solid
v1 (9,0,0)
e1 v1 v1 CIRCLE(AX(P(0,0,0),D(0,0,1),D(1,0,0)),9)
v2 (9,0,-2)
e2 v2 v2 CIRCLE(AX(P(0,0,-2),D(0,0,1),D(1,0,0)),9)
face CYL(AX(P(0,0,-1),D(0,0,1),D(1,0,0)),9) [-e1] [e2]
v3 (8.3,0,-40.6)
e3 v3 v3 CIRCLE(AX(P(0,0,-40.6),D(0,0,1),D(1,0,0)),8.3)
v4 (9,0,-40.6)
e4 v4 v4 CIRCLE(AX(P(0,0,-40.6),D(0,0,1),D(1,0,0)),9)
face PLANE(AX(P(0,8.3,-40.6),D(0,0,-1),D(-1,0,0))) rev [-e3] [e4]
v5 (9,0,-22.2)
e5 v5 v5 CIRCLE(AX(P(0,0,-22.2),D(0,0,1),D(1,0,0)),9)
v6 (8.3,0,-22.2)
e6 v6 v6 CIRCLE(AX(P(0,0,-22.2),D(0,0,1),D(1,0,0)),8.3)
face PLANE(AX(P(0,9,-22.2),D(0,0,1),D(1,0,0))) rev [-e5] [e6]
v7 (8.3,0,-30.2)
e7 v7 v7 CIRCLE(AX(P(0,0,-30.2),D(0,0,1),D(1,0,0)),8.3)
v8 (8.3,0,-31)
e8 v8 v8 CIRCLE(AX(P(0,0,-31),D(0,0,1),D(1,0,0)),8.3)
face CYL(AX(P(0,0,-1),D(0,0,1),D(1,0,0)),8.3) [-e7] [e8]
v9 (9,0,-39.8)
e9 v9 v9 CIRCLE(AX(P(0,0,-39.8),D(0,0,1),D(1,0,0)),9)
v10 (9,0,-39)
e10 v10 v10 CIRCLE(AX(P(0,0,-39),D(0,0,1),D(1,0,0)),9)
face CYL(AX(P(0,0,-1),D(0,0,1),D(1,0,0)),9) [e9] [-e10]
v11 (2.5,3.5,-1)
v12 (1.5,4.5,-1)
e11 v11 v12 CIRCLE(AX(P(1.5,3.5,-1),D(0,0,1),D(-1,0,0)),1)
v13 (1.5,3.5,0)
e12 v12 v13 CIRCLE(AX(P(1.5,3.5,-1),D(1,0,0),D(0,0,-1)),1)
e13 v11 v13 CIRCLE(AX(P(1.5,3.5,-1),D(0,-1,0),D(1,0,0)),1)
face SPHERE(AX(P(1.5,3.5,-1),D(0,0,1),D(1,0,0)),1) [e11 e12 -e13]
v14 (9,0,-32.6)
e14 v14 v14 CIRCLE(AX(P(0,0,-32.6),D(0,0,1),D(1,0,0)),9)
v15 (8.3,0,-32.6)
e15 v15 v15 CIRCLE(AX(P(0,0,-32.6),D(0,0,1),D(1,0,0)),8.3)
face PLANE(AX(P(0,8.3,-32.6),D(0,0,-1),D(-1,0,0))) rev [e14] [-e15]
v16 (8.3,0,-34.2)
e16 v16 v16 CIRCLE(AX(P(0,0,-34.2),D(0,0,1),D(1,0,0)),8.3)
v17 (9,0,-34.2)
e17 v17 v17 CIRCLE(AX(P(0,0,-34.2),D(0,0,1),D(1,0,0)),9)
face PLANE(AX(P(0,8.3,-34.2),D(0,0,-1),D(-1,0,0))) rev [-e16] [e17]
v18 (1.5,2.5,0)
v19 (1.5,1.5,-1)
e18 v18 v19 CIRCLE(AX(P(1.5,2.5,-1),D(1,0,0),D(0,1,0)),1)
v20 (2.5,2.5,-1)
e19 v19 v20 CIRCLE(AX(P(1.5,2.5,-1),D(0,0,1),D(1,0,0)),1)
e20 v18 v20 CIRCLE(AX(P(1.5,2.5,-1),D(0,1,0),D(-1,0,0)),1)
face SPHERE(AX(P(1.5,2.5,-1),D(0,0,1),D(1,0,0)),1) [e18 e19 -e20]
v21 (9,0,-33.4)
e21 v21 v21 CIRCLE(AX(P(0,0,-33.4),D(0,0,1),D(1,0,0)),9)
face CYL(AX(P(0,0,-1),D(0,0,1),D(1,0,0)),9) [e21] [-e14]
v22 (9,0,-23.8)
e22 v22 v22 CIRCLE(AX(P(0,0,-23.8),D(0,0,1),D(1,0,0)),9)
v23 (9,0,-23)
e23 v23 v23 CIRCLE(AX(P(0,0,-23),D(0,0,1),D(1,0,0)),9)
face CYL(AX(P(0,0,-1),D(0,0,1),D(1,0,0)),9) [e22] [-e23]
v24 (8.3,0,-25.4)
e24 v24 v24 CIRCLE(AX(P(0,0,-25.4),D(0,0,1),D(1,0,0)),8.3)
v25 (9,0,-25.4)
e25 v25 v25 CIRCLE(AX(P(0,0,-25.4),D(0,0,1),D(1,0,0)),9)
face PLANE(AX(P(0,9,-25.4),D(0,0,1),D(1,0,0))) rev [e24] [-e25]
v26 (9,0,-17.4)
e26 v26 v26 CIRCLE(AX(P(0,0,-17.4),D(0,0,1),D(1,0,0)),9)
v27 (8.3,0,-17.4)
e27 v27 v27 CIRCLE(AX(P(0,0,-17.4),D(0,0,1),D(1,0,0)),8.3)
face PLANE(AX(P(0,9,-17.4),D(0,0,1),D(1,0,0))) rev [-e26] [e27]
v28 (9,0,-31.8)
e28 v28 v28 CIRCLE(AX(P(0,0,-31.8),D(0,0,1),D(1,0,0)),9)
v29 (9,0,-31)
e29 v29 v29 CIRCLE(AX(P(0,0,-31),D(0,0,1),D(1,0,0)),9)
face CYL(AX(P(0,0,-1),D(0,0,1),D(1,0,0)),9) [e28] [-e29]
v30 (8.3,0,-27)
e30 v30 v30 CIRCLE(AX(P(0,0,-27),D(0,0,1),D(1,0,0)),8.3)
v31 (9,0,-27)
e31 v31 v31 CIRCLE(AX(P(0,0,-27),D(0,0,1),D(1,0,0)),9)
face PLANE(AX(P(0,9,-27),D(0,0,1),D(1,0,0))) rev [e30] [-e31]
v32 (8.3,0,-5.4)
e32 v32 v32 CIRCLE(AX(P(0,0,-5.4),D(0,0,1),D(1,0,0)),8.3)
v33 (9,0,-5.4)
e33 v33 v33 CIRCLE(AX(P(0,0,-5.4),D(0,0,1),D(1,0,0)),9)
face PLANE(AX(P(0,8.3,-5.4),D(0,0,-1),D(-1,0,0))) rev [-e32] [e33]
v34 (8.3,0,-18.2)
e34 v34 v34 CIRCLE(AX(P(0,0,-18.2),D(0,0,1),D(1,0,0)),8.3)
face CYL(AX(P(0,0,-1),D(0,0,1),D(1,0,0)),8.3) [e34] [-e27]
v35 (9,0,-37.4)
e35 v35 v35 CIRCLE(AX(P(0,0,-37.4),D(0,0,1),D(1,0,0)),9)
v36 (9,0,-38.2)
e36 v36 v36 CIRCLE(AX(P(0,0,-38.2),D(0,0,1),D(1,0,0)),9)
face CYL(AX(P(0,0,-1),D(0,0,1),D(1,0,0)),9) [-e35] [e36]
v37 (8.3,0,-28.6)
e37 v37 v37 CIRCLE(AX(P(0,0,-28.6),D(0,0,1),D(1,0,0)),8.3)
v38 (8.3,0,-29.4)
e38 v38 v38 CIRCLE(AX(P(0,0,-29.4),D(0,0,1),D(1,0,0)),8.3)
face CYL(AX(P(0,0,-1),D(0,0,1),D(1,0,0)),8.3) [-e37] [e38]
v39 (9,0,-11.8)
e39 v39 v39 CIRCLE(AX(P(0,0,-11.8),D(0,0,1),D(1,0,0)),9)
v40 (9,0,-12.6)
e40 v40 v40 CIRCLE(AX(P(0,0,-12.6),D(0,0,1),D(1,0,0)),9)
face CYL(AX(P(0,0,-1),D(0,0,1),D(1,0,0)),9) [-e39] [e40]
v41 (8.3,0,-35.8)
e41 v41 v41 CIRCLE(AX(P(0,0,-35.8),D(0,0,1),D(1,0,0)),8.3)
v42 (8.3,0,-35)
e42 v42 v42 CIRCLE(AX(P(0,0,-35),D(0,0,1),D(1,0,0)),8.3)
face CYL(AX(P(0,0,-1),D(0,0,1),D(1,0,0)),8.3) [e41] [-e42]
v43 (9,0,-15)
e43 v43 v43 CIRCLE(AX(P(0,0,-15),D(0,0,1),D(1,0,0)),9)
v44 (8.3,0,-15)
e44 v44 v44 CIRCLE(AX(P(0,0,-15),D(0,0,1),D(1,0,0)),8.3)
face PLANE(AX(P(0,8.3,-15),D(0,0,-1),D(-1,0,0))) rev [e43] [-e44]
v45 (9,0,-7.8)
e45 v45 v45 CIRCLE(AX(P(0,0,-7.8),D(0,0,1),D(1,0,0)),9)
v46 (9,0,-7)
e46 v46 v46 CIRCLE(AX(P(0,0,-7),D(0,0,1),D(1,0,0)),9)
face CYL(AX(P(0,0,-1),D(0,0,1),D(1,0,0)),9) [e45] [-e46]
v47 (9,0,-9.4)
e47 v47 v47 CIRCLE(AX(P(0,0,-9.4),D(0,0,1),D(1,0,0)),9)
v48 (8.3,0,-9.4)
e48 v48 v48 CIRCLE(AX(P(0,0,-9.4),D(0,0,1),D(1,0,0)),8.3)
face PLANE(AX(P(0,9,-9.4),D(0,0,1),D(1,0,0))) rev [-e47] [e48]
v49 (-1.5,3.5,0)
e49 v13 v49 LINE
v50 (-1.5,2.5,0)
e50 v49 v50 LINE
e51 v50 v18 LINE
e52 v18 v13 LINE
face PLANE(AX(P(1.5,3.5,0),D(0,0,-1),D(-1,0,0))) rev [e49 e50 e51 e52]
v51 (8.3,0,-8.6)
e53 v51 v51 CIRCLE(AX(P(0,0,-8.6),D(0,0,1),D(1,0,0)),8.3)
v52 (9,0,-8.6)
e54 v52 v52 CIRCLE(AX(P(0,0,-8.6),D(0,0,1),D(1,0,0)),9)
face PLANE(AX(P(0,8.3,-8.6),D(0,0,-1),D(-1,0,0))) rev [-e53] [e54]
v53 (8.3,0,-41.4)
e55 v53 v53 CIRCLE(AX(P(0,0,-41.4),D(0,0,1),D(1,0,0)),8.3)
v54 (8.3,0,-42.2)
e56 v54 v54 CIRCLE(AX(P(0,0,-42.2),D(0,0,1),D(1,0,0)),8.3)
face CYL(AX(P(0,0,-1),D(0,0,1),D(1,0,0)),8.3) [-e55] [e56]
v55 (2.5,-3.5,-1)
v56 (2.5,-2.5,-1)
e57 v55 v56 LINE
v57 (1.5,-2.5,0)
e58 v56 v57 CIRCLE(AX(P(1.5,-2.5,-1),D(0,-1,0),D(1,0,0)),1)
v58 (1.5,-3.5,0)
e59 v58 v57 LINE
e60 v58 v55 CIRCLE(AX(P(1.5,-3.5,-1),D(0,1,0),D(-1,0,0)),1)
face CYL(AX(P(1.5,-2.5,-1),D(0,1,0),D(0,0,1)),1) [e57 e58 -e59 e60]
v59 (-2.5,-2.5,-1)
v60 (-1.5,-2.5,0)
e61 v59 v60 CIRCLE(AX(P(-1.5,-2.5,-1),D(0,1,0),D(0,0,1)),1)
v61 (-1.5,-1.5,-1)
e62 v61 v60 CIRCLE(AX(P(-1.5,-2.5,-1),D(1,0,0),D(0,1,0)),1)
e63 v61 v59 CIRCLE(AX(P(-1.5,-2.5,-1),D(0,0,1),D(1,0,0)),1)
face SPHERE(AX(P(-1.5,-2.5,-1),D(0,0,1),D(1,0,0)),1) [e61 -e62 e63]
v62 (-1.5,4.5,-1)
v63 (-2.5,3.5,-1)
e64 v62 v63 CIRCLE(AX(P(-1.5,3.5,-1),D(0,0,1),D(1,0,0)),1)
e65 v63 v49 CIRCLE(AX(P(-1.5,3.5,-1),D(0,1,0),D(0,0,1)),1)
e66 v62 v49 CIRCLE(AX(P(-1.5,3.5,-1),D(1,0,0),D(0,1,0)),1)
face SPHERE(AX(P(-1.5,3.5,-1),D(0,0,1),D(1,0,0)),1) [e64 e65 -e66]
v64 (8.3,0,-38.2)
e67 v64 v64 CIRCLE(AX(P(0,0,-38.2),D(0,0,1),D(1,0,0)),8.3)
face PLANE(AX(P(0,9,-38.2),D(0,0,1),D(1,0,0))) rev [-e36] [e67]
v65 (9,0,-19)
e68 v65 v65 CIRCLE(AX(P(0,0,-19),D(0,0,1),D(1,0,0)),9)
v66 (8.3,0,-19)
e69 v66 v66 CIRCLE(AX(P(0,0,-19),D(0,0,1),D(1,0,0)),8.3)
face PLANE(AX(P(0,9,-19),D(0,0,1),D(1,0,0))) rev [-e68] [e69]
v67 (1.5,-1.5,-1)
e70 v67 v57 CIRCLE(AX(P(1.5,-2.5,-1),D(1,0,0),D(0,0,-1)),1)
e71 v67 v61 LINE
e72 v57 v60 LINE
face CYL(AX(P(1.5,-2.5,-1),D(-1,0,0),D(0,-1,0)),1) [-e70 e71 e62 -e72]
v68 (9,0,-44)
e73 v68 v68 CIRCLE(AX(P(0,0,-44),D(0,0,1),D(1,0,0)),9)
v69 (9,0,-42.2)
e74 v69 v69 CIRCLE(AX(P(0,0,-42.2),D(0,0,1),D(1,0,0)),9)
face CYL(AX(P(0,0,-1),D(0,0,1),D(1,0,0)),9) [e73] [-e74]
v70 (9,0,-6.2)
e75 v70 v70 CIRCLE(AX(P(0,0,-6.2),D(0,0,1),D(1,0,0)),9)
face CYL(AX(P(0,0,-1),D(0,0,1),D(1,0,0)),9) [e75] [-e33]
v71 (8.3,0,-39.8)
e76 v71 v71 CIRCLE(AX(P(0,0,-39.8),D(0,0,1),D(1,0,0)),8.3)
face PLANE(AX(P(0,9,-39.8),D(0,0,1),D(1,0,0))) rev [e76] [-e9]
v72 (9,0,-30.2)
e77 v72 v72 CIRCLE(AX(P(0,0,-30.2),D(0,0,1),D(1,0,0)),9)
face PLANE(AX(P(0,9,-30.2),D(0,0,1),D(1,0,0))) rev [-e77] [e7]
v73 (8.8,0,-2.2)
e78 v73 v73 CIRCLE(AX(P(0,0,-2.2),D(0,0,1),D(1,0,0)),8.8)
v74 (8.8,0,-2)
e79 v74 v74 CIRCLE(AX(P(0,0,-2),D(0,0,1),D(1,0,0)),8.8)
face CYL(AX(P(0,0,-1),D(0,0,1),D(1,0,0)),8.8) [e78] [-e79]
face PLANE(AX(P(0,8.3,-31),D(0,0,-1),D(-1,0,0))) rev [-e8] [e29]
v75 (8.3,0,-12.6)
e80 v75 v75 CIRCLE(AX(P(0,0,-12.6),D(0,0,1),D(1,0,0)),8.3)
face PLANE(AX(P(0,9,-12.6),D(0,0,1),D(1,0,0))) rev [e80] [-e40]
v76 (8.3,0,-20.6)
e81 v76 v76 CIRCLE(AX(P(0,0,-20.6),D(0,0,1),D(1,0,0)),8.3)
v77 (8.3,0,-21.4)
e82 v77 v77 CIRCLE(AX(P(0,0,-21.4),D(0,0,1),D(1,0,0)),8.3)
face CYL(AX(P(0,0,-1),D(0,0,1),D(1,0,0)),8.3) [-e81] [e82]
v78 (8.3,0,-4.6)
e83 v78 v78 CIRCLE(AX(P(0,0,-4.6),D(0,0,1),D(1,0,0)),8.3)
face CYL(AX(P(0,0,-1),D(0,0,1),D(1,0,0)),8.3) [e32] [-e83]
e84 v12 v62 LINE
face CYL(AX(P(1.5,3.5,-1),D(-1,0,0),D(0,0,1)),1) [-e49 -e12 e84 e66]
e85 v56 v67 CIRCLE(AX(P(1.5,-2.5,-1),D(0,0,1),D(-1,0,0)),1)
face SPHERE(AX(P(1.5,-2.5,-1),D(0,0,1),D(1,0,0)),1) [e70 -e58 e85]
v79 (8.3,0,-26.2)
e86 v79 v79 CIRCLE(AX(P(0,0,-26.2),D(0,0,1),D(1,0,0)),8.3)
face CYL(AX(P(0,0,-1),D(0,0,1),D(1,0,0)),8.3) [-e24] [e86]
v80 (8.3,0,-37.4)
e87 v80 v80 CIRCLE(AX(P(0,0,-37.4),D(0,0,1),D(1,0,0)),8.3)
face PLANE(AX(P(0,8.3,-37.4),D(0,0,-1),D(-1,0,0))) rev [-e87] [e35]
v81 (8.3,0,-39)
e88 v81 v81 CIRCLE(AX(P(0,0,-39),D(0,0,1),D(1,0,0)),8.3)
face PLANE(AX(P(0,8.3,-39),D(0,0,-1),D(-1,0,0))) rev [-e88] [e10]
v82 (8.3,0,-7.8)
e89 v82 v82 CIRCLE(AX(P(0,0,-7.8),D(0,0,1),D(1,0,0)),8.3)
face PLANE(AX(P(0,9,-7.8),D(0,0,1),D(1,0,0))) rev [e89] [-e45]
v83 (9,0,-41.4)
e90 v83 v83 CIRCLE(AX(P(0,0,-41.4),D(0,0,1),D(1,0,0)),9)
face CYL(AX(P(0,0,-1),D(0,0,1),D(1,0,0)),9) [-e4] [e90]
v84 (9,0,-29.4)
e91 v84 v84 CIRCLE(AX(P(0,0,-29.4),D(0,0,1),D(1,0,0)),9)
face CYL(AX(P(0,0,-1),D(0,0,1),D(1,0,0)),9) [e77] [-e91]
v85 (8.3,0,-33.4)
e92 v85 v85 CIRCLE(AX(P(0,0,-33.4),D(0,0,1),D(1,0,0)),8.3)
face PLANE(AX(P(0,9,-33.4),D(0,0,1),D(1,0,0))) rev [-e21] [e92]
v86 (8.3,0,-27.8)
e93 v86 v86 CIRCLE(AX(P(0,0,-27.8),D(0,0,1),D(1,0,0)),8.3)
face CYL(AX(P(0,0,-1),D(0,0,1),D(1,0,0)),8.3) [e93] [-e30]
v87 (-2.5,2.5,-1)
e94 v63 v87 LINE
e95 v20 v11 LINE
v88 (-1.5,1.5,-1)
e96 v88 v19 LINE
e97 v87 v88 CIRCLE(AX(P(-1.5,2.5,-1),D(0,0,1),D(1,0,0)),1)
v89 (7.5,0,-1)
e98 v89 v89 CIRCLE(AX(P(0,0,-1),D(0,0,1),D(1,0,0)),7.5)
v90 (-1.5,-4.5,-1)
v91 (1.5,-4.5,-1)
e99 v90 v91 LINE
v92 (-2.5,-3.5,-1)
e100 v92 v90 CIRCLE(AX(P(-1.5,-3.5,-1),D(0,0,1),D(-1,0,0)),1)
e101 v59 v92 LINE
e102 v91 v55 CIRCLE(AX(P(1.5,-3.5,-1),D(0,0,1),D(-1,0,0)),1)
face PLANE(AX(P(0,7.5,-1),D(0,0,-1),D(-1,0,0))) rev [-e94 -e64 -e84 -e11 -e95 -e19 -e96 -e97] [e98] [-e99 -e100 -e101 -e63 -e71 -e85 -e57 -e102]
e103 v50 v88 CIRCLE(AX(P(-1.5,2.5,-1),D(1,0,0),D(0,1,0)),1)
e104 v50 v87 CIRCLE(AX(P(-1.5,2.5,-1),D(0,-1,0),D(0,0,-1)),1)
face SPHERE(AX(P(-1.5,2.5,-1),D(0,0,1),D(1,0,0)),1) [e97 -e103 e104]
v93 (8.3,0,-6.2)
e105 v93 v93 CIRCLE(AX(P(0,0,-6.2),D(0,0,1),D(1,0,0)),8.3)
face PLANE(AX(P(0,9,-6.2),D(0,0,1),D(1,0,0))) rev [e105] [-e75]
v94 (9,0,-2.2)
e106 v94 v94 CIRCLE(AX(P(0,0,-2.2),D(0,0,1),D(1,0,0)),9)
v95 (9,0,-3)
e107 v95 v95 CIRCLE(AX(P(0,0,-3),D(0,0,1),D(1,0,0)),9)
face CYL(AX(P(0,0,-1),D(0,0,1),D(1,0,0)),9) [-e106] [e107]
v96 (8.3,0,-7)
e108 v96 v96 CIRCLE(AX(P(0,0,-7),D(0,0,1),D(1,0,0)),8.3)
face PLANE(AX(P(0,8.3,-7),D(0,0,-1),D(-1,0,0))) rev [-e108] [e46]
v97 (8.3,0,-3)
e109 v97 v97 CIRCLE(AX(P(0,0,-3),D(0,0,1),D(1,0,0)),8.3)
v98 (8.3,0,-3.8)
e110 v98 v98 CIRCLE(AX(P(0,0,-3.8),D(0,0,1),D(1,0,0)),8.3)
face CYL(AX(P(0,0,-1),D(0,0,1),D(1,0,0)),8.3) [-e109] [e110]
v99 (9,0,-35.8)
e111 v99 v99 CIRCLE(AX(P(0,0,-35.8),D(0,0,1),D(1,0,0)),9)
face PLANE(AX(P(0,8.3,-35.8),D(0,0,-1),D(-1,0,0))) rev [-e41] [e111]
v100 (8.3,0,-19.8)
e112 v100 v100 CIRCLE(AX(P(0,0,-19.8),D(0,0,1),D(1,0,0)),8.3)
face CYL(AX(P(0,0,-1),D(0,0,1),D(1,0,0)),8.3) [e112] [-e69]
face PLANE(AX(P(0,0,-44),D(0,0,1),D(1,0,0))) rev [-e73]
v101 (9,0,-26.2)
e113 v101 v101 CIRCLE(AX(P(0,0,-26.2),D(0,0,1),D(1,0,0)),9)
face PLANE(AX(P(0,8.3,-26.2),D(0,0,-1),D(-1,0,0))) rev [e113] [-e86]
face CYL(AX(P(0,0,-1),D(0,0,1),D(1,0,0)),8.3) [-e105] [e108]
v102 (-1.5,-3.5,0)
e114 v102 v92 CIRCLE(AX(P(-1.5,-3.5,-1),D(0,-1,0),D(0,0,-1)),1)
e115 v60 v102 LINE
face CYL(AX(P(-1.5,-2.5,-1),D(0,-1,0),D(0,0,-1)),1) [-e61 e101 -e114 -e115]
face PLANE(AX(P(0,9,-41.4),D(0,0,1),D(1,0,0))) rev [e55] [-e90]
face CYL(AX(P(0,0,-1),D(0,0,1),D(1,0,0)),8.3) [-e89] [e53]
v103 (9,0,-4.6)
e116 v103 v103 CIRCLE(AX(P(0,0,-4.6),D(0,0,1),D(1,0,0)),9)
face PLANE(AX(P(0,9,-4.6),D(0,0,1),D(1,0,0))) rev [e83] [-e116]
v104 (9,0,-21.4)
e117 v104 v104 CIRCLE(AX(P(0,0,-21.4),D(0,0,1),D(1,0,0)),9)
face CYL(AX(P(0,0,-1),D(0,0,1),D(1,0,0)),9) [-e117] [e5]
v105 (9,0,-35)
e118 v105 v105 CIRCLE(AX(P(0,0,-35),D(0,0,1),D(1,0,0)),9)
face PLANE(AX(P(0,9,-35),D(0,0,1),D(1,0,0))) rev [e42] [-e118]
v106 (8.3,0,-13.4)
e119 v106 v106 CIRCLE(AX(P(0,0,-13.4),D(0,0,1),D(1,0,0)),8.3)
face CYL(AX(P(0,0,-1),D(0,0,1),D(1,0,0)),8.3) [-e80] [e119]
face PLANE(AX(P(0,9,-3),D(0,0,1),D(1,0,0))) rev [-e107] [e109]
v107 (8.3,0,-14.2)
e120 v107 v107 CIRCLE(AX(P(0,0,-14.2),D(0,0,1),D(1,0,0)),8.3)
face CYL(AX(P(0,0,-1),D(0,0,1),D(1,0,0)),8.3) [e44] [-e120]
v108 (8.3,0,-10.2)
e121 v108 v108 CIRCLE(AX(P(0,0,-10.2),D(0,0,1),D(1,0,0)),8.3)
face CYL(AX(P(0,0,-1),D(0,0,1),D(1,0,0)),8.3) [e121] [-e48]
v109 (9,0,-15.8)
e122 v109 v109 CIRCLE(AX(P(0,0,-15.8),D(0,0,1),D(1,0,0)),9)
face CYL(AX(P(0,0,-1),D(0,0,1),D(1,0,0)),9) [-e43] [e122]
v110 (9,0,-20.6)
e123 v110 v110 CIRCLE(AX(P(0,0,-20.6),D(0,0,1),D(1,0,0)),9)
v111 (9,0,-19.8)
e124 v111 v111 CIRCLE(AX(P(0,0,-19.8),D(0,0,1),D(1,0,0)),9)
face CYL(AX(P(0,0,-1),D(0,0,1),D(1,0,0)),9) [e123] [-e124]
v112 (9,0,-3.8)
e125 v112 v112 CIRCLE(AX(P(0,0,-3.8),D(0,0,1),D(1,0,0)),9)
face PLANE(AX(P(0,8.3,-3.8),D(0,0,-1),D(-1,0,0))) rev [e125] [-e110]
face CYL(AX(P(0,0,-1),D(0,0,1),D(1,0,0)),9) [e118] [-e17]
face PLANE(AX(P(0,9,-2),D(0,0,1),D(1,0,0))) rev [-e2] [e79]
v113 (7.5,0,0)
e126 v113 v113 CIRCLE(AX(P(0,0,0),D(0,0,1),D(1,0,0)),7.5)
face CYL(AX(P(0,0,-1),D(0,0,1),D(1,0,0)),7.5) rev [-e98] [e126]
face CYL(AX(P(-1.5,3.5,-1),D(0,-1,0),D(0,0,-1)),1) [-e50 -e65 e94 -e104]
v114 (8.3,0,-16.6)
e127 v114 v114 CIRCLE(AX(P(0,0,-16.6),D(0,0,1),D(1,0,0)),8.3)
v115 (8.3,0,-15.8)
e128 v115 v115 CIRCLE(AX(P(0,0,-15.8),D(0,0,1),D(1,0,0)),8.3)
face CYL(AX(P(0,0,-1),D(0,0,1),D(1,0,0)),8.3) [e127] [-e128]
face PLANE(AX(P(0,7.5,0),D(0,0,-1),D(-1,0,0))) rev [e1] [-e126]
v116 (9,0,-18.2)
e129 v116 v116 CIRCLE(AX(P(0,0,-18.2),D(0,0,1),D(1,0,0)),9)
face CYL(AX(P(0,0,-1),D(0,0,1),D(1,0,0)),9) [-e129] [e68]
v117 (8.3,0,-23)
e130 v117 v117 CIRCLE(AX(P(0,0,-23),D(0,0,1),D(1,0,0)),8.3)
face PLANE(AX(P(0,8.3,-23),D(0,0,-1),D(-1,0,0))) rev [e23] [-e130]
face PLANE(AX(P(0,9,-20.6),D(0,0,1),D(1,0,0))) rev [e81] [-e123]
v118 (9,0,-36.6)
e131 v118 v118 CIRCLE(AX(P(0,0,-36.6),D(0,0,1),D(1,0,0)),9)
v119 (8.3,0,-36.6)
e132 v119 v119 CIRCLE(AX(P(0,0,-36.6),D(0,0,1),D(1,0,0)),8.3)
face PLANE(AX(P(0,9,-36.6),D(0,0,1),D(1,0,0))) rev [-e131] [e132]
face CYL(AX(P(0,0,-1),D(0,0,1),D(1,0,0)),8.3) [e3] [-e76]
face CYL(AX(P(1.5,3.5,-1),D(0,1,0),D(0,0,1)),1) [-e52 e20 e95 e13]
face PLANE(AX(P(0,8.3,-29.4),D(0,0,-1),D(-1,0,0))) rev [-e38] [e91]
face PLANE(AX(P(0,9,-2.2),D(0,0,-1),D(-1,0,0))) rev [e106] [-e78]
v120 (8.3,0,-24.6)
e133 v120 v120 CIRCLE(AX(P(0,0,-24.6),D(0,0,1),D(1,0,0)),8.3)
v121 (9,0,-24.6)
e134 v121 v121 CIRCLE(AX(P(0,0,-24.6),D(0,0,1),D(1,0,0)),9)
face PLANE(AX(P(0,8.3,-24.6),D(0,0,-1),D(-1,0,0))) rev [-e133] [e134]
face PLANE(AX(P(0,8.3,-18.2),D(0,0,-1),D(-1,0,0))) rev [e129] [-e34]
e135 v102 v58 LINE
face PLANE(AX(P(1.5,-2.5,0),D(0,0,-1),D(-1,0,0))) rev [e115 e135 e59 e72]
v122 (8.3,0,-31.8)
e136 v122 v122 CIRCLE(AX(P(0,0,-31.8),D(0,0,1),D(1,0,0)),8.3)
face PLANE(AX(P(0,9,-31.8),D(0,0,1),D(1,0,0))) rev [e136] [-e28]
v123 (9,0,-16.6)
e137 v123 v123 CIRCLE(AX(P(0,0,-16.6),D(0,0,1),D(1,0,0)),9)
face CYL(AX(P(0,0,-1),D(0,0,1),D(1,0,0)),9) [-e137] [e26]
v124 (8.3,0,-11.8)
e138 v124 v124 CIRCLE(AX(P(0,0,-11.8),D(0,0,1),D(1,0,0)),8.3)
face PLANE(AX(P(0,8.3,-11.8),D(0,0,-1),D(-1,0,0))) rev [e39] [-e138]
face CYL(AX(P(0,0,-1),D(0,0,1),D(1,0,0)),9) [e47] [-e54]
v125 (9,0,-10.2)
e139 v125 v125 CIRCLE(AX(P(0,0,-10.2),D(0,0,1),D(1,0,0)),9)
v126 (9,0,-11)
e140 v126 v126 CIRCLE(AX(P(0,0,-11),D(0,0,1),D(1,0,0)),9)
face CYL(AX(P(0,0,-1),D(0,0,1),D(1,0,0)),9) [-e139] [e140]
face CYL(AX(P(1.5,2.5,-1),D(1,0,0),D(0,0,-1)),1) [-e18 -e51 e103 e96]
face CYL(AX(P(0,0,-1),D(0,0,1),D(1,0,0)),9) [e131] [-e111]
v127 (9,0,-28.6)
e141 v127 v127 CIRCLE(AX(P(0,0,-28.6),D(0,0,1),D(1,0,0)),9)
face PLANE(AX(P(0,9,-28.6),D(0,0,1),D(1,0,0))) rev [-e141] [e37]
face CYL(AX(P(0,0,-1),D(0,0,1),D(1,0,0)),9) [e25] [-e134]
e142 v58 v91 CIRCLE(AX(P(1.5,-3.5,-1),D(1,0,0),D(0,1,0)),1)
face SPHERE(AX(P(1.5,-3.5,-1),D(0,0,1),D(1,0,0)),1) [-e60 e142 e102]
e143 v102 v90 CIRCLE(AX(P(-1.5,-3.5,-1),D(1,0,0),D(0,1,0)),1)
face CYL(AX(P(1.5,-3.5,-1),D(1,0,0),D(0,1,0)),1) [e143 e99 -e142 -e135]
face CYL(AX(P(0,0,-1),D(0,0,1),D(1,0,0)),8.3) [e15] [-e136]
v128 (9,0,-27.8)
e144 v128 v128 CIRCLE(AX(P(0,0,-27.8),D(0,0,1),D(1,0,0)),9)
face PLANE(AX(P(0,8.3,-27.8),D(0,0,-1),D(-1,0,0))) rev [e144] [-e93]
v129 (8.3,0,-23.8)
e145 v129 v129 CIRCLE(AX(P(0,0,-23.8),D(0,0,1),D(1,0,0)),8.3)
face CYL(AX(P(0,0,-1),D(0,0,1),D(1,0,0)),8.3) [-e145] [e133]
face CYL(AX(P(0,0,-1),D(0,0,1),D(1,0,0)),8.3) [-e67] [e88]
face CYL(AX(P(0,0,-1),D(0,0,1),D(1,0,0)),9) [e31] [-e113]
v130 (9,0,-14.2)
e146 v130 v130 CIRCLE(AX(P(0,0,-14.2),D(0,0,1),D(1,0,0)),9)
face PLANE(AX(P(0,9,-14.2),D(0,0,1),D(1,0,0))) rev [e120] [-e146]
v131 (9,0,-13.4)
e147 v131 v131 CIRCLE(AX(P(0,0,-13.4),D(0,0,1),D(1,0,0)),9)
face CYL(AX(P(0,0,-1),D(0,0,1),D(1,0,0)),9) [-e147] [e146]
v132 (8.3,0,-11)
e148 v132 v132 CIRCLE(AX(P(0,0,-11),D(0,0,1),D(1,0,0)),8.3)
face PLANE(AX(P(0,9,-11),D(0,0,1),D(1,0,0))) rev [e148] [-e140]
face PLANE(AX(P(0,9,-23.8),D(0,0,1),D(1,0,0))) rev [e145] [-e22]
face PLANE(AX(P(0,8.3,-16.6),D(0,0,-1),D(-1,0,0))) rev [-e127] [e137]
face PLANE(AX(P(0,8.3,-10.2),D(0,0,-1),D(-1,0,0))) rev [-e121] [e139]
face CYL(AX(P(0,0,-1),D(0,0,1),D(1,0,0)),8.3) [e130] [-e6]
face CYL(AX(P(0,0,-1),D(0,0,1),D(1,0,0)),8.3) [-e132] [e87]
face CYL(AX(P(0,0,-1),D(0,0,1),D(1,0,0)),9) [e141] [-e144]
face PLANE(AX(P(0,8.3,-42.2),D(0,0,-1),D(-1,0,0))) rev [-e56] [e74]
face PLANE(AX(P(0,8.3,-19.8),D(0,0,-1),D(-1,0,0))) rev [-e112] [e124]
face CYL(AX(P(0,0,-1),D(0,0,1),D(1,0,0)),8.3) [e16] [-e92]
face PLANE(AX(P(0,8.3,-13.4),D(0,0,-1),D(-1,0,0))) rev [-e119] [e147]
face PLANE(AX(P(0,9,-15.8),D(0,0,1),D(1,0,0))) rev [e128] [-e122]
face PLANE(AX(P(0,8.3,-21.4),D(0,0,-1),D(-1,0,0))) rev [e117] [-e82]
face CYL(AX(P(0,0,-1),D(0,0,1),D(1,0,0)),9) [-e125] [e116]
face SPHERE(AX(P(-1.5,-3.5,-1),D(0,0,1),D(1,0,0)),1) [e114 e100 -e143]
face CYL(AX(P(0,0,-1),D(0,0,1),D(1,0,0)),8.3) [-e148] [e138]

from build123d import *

# Parameters (mm, degrees)
BOSS_EXTRU_1_DEPTH = 1
CONG_1_R           = 1


with BuildPart() as part:
    # Esquisse1 → Révolution1 (revolve)
    with BuildSketch(Plane(origin=(0, 0, 0), x_dir=(0, 0, -1), z_dir=(1, 0, 0)), mode=Mode.PRIVATE) as r_volution1_sk:
        Polygon((3, 9), (3, 8.3), (3.8, 8.3), (3.8, 9), (4.6, 9), (4.6, 8.3), (5.4, 8.3), (5.4, 9), (6.2, 9), (6.2, 8.3), (7, 8.3), (7, 9), (7.8, 9), (7.8, 8.3), (8.6, 8.3), (8.6, 9), (9.4, 9), (9.4, 8.3), (10.2, 8.3), (10.2, 9), (11, 9), (11, 8.3), (11.8, 8.3), (11.8, 9), (12.6, 9), (12.6, 8.3), (13.4, 8.3), (13.4, 9), (14.2, 9), (14.2, 8.3), (15, 8.3), (15, 9), (15.8, 9), (15.8, 8.3), (16.6, 8.3), (16.6, 9), (17.4, 9), (17.4, 8.3), (18.2, 8.3), (18.2, 9), (19, 9), (19, 8.3), (19.8, 8.3), (19.8, 9), (20.6, 9), (20.6, 8.3), (21.4, 8.3), (21.4, 9), (22.2, 9), (22.2, 8.3), (23, 8.3), (23, 9), (23.8, 9), (23.8, 8.3), (24.6, 8.3), (24.6, 9), (25.4, 9), (25.4, 8.3), (26.2, 8.3), (26.2, 9), (27, 9), (27, 8.3), (27.8, 8.3), (27.8, 9), (28.6, 9), (28.6, 8.3), (29.4, 8.3), (29.4, 9), (30.2, 9), (30.2, 8.3), (31, 8.3), (31, 9), (31.8, 9), (31.8, 8.3), (32.6, 8.3), (32.6, 9), (33.4, 9), (33.4, 8.3), (34.2, 8.3), (34.2, 9), (35, 9), (35, 8.3), (35.8, 8.3), (35.8, 9), (36.6, 9), (36.6, 8.3), (37.4, 8.3), (37.4, 9), (38.2, 9), (38.2, 8.3), (39, 8.3), (39, 9), (39.8, 9), (39.8, 8.3), (40.6, 8.3), (40.6, 9), (41.4, 9), (41.4, 8.3), (42.2, 8.3), (42.2, 9), (44, 9), (44, 0), (1, 0), (1, 7.5), (0, 7.5), (0, 9), (2, 9), (2, 8.8), (2.2, 8.8), (2.2, 9), align=None)
    revolve(r_volution1_sk.sketch.rotate(Axis((0, 0, -1), (0, 0, -1)), 90), axis=Axis((0, 0, -1), (0, 0, -1)))

    # Esquisse2 → Boss.-Extru.1 (add)
    with BuildSketch(Plane.XY.offset(-1)):
        with BuildLine():
            Line((-1.5, 4.5), (1.5, 4.5))
            ThreePointArc((1.5, 4.5), (2.207106781, 4.207106781), (2.5, 3.5))
            Line((2.5, 3.5), (2.5, 2.5))
            ThreePointArc((2.5, 2.5), (2.207106781, 1.792893219), (1.5, 1.5))
            Line((1.5, 1.5), (-1.5, 1.5))
            ThreePointArc((-1.5, 1.5), (-2.207106781, 1.792893219), (-2.5, 2.5))
            Line((-2.5, 2.5), (-2.5, 3.5))
            ThreePointArc((-2.5, 3.5), (-2.207106781, 4.207106781), (-1.5, 4.5))
        make_face()
        with BuildLine():
            Line((1.5, -1.5), (-1.5, -1.5))
            ThreePointArc((-1.5, -1.5), (-2.207106781, -1.792893219), (-2.5, -2.5))
            Line((-2.5, -2.5), (-2.5, -3.5))
            ThreePointArc((-2.5, -3.5), (-2.207106781, -4.207106781), (-1.5, -4.5))
            Line((-1.5, -4.5), (1.5, -4.5))
            ThreePointArc((1.5, -4.5), (2.207106781, -4.207106781), (2.5, -3.5))
            Line((2.5, -3.5), (2.5, -2.5))
            ThreePointArc((2.5, -2.5), (2.207106781, -1.792893219), (1.5, -1.5))
        make_face()
    extrude(amount=BOSS_EXTRU_1_DEPTH)

    # Congé1
    cong_1_edges = [part.edges().sort_by_distance(p)[0] for p in [
        (2.5, -3, 0),
        (2.207106781, -4.207106781, 0),
        (0, -4.5, 0),
        (-2.207106781, -4.207106781, 0),
        (-2.5, -3, 0),
        (-2.207106781, -1.792893219, 0),
        (0, -1.5, 0),
        (2.207106781, -1.792893219, 0),
        (2.5, 3, 0),
        (2.207106781, 1.792893219, 0),
        (0, 1.5, 0),
        (-2.207106781, 1.792893219, 0),
        (-2.5, 3, 0),
        (-2.207106781, 4.207106781, 0),
        (0, 4.5, 0),
        (2.207106781, 4.207106781, 0),
    ]]
    fillet(cong_1_edges, radius=CONG_1_R - 0.0001)  # a hair under: the kernel refuses the full size


solid = part.part
